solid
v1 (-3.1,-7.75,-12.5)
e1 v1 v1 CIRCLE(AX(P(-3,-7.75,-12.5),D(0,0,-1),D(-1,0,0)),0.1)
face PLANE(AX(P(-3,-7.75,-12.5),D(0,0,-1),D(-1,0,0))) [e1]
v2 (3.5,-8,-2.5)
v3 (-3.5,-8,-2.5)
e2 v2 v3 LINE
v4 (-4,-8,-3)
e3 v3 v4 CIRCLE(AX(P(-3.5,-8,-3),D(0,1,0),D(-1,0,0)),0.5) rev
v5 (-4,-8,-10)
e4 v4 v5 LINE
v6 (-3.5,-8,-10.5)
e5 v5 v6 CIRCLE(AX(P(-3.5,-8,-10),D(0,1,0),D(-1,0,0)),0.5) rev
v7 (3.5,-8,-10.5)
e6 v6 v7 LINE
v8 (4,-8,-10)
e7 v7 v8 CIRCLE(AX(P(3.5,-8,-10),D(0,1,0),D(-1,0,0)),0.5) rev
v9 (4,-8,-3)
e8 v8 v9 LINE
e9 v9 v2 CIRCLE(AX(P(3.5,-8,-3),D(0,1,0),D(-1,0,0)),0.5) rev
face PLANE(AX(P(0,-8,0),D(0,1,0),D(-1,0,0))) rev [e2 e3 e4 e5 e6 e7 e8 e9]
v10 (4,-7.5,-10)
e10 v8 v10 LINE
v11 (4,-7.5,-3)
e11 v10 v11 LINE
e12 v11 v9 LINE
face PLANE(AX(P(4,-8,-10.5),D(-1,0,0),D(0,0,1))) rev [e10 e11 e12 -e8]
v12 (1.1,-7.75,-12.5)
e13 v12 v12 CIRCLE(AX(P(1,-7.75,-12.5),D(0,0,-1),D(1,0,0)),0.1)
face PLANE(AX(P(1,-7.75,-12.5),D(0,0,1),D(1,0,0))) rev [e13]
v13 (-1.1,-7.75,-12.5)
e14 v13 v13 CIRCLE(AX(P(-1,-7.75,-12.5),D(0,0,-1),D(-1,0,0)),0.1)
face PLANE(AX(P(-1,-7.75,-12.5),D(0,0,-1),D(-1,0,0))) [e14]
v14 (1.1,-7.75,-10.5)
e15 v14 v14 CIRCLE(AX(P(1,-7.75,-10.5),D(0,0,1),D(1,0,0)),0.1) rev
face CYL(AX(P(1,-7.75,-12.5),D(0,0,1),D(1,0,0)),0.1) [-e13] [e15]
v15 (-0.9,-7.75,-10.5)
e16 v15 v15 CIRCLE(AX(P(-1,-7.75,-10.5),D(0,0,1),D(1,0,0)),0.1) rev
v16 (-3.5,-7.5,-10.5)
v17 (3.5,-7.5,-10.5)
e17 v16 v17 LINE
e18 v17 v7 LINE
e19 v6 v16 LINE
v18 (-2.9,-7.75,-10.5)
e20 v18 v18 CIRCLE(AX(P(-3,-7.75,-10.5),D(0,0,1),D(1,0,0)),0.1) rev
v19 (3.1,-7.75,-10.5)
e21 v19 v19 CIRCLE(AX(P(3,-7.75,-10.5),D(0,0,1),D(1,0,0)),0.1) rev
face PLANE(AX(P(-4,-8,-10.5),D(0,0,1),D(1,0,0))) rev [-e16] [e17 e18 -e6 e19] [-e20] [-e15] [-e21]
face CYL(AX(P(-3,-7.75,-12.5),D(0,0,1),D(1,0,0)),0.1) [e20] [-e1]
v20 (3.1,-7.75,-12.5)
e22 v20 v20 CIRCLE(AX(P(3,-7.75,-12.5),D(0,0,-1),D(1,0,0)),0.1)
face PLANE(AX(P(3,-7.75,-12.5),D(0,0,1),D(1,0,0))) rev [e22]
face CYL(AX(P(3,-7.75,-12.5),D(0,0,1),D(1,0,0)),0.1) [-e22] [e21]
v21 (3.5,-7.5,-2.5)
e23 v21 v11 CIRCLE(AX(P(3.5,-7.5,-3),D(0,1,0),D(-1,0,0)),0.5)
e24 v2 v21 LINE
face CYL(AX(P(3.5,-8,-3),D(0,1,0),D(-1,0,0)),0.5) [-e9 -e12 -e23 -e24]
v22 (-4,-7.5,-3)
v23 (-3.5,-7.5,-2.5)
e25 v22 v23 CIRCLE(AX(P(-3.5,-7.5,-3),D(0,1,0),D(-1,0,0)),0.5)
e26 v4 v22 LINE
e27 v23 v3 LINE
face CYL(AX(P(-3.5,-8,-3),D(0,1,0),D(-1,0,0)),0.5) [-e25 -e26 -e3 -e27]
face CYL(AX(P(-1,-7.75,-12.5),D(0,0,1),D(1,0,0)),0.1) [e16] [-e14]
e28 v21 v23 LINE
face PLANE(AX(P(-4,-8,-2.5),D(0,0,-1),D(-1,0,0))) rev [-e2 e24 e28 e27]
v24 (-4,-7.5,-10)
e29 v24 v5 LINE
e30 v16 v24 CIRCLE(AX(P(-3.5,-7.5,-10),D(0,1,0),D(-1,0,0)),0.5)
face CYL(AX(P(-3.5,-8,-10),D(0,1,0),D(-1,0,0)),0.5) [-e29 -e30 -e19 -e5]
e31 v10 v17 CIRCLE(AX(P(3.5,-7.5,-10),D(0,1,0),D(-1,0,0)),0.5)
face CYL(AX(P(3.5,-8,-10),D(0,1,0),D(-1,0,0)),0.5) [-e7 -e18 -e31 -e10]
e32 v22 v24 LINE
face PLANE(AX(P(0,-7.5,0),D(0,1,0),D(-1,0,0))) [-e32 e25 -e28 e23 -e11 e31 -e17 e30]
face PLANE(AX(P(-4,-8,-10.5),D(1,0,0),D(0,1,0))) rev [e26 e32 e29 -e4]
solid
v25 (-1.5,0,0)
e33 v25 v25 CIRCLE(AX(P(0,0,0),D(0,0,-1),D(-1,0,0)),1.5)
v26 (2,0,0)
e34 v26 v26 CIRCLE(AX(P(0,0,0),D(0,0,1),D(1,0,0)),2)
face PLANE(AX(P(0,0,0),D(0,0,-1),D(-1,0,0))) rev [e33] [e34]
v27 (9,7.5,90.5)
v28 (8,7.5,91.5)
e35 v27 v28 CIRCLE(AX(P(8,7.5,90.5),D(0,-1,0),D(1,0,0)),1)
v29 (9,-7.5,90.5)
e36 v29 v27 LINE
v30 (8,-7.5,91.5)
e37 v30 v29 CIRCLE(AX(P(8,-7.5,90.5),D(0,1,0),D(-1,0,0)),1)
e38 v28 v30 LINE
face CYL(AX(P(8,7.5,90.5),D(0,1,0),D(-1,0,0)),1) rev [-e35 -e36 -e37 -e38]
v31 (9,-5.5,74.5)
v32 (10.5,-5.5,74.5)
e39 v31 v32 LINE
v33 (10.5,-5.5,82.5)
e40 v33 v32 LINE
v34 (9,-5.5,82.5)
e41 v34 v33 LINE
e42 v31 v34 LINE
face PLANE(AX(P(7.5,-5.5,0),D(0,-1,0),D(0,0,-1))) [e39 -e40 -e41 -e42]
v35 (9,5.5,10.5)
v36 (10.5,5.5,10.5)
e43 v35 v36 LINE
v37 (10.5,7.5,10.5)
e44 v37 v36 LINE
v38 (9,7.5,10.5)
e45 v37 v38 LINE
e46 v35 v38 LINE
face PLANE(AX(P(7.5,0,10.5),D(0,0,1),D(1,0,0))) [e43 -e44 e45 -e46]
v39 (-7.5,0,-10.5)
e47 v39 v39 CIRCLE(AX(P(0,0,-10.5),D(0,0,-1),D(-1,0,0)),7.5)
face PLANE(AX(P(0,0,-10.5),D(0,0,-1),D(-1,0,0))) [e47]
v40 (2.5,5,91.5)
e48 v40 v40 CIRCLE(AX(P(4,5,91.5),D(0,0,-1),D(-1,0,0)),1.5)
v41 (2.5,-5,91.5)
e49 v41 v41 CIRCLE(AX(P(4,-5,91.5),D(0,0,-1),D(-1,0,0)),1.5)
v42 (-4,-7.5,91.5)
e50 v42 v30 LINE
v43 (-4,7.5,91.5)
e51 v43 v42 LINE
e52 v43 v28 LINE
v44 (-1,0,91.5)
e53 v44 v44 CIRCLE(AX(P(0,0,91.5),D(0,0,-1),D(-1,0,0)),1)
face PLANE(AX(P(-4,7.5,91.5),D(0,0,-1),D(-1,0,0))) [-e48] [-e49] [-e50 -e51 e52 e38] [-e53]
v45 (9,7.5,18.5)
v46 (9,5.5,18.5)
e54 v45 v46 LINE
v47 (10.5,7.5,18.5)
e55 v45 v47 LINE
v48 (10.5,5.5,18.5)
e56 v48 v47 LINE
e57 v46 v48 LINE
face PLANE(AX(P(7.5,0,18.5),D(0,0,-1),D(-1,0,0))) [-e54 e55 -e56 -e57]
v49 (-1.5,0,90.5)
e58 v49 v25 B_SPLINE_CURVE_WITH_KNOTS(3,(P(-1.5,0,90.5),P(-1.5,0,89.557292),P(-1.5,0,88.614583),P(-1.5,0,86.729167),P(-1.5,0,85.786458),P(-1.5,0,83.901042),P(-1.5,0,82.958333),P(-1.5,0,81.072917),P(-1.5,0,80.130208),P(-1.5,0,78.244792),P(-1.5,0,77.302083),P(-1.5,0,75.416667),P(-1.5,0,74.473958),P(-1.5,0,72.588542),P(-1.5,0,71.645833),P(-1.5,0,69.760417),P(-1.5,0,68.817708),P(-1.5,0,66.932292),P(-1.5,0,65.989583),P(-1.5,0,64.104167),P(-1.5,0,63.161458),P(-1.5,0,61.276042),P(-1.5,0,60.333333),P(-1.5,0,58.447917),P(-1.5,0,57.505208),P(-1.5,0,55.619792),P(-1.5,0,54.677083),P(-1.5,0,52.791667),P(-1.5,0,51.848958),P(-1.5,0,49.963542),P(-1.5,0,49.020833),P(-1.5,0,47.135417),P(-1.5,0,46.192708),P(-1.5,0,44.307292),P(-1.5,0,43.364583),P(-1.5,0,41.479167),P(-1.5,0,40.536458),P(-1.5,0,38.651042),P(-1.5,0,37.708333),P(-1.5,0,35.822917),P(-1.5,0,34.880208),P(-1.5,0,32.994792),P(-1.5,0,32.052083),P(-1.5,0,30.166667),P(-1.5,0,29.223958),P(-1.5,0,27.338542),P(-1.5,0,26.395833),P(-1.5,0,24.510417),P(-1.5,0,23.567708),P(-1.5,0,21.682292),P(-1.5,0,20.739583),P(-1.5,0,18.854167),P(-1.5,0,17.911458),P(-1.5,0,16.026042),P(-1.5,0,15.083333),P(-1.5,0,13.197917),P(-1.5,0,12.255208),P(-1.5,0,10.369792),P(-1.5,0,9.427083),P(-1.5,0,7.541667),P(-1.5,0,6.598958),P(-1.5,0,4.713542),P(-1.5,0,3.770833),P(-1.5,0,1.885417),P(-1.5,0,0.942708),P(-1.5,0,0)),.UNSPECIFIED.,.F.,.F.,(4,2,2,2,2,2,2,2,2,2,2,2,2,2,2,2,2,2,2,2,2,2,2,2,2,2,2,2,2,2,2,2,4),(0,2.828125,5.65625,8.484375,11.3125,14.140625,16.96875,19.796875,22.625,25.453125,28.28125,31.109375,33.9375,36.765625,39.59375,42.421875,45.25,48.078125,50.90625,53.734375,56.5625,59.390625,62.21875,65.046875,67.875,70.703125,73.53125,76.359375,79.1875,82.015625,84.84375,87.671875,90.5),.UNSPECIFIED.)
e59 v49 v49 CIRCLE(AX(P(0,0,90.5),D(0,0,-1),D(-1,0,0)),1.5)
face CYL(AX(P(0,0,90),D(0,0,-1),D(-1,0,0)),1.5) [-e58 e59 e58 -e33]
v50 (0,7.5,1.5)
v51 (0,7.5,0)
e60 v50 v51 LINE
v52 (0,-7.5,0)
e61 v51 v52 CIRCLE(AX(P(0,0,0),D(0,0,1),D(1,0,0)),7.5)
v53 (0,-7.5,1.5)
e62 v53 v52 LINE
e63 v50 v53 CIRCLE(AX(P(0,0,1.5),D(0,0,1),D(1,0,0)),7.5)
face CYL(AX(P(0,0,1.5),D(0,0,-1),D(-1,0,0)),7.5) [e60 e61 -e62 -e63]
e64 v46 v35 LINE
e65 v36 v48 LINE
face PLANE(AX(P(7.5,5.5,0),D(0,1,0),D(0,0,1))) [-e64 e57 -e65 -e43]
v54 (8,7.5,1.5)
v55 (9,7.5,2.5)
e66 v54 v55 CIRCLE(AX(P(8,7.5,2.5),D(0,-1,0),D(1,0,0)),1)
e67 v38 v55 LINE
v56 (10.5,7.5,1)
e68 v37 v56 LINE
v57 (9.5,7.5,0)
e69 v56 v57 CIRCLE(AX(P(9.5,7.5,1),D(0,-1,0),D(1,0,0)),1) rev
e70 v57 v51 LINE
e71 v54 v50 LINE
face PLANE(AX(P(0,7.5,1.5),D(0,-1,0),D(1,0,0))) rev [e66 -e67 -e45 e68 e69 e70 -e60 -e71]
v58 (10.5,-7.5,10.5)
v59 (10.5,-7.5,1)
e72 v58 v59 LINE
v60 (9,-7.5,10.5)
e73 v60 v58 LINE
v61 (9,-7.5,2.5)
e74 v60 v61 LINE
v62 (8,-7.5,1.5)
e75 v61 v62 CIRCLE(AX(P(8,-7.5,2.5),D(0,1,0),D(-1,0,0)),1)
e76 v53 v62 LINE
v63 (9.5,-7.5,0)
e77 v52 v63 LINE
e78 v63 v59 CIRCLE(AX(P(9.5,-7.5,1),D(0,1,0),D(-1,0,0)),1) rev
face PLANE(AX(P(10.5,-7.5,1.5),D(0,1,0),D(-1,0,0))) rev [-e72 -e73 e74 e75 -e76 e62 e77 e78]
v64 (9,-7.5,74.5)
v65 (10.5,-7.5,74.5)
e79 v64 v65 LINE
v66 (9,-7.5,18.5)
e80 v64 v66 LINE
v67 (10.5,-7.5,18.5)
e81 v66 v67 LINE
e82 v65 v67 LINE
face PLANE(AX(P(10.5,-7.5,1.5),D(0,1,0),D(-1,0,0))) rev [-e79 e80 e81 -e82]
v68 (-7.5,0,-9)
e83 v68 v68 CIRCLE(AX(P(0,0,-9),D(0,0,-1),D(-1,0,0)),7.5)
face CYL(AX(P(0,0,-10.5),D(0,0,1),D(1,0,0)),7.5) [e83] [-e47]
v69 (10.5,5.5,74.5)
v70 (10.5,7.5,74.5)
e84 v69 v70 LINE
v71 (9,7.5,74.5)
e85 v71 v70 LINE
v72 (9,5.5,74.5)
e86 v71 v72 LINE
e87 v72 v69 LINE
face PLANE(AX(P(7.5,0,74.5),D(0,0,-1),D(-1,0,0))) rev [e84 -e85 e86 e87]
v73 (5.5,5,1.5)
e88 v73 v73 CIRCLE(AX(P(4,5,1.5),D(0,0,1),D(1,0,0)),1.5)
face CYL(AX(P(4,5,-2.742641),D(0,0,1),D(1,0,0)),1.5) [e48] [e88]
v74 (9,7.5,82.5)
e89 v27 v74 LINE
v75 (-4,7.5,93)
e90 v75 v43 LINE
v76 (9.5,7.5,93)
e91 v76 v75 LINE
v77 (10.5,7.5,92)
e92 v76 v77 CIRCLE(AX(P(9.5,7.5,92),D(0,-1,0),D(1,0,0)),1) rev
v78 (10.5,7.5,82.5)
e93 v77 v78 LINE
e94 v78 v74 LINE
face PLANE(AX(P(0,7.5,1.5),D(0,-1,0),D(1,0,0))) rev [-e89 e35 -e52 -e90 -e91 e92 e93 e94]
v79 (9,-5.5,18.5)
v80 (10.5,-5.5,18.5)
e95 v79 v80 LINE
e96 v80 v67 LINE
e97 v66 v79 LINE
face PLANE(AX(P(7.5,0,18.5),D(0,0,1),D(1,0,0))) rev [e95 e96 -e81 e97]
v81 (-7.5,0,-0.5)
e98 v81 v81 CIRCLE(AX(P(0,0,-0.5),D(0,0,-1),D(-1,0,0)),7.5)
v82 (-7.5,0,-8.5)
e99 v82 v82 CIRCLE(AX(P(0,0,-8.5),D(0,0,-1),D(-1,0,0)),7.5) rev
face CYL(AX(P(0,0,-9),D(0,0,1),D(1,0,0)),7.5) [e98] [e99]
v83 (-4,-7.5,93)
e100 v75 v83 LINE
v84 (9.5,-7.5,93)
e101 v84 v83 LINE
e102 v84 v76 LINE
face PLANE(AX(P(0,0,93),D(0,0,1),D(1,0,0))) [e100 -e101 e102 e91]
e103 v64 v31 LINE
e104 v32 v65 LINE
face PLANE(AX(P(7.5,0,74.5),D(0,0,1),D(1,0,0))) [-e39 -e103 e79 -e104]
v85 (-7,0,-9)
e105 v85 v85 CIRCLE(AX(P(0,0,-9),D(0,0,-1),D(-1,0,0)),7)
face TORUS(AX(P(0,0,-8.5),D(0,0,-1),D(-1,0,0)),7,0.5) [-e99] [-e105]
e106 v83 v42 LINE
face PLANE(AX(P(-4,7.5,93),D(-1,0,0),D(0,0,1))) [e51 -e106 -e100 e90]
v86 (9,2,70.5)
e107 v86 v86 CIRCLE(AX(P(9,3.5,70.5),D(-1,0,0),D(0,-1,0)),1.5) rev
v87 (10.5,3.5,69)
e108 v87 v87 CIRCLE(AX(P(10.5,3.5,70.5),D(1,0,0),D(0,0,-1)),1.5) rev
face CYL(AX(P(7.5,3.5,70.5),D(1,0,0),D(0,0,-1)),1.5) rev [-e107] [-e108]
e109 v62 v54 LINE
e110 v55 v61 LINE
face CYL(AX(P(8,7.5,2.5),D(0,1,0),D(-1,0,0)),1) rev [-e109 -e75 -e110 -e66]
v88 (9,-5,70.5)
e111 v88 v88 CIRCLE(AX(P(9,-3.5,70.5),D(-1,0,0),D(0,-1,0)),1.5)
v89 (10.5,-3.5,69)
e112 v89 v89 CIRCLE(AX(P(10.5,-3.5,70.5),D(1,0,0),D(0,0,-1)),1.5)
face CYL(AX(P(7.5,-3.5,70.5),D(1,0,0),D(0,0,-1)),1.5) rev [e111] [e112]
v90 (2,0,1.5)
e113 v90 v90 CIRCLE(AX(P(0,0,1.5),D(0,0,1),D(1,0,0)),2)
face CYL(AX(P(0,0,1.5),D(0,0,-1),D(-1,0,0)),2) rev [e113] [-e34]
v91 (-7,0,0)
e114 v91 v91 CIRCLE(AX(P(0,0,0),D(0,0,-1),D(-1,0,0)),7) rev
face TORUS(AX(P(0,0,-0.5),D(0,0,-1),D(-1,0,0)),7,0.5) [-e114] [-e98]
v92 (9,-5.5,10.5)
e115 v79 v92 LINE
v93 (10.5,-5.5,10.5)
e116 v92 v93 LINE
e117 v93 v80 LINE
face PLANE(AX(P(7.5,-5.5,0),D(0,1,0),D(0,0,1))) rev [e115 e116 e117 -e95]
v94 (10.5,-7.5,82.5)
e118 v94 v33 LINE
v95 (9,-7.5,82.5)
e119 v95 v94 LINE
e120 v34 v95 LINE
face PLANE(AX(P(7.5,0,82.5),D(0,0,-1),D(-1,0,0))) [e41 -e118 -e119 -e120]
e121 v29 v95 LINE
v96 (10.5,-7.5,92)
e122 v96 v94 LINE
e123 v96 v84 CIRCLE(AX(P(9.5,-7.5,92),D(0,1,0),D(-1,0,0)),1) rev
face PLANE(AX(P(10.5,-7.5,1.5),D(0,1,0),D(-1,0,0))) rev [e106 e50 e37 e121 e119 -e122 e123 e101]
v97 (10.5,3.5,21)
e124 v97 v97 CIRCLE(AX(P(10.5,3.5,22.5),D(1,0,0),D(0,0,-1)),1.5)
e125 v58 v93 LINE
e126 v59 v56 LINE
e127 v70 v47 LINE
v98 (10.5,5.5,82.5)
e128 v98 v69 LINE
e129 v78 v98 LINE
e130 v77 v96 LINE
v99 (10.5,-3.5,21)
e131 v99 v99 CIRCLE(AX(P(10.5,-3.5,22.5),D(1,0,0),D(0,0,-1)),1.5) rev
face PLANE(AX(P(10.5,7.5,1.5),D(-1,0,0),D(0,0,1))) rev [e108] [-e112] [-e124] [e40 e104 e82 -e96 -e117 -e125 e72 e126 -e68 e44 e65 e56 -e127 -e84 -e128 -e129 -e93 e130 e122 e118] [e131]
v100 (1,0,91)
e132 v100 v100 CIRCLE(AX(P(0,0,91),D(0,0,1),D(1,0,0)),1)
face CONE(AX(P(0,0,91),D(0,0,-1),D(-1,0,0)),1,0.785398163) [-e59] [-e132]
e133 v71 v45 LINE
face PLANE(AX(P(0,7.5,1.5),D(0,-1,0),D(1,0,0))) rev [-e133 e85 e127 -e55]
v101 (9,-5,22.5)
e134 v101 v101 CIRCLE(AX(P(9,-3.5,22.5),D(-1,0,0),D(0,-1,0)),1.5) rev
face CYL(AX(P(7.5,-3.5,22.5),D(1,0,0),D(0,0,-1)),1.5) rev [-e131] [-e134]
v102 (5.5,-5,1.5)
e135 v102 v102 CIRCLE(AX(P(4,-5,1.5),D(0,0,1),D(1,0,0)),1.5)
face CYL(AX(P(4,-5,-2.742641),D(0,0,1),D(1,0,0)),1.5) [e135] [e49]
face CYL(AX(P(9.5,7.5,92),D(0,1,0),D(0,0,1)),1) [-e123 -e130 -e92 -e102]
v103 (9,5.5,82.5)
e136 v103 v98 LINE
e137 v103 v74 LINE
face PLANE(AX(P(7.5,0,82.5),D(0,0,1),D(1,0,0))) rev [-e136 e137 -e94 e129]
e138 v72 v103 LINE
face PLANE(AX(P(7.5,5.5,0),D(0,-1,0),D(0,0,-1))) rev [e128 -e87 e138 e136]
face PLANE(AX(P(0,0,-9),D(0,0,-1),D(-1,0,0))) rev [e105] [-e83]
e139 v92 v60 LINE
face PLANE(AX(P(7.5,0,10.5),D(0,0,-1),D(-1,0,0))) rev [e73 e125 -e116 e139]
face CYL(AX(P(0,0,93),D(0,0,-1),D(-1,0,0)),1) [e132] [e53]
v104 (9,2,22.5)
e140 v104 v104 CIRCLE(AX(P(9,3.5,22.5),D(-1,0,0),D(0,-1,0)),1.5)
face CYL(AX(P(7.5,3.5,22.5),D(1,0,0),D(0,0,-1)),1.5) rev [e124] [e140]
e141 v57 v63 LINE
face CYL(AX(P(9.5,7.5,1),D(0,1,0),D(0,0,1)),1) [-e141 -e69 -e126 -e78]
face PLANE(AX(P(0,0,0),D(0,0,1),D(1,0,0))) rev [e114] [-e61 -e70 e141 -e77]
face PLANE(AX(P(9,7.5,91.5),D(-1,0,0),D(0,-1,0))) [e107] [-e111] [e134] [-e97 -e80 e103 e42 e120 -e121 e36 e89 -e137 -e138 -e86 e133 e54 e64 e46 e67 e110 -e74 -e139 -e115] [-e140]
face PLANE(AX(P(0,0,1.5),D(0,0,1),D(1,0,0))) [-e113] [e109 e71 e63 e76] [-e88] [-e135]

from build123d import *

# Parameters (mm, degrees)
SKETCH_1_R          = 1.5
EXTRUDE_1_DEPTH     = 90
SKETCH_2_R          = 1
EXTRUDE_2_DEPTH     = 3
CHAMFER_1_SIZE      = 1
SKETCH_3_R          = 7.5
EXTRUDE_3_DEPTH     = 9
FILLET_1_R          = 0.5
EXTRUDE_START       = 1.5
SKETCH_4_R          = 2
EXTRUDE_4_DEPTH     = 1.5
SKETCH_5_R          = 7.5
EXTRUDE_5_DEPTH     = 1.5
EXTRUDE_6_DEPTH     = 15
FILLET_2_R          = 1
SKETCH_8_W          = 8
SKETCH_8_H          = 2
SKETCH_8_R          = 1.5
CUT_EXTRUDE_1_DEPTH = 3
SKETCH_9_R          = 1.5
EXTRUDE_7_DEPTH     = 91.5
SKETCH_10_W         = 8
SKETCH_10_H         = 8
EXTRUDE_8_DEPTH     = 0.5
SKETCH_12_R         = 0.1
EXTRUDE_9_DEPTH     = 2
FILLET_3_R          = 0.5


with BuildPart() as part:
    # 草图1 → 凸台-拉伸1 (new body)
    with BuildSketch(Plane.XY):
        with Locations(Location((0, 0, 0), (0, 0, 180))):
            Circle(SKETCH_1_R)
    extrude(amount=EXTRUDE_1_DEPTH)

    # 草图2 → 凸台-拉伸2 (add)
    with BuildSketch(Plane.XY.offset(90)):
        Circle(SKETCH_2_R)
    extrude(amount=EXTRUDE_2_DEPTH)

    # 倒角1
    # the kernel refuses this chamfer: 1 mm, written as the material it adds along each edge
    with BuildSketch(Plane(origin=(0, 0, 90), x_dir=(1, 0, 0), z_dir=(0, -1, 0))) as chamfer_1_piece_1_section:
        Polygon((1 + CHAMFER_1_SIZE, 0), (1, CHAMFER_1_SIZE), (1, 0), align=None)
    chamfer_1_piece_1 = revolve(axis=Axis((0, 0, 90), (0, 0, 1)), mode=Mode.PRIVATE)
    chamfer_1_piece_1 = chamfer_1_piece_1 & Plane(origin=(0, 0, 90.753826293), x_dir=(-1, 0, 0), z_dir=(0, 0, -1)) * Cylinder(1.5, 8, mode=Mode.PRIVATE)
    add(chamfer_1_piece_1)

    # 草图3 → 凸台-拉伸3 (add)
    with BuildSketch(Plane(origin=(0, 0, 0), x_dir=(-1, 0, 0), z_dir=(0, 0, -1))):
        Circle(SKETCH_3_R)
    extrude(amount=EXTRUDE_3_DEPTH)

    # 圆角1
    fillet_1_edges = [part.edges().sort_by_distance(p)[0] for p in [
        (7.5, 0, 0),
        (7.5, 0, -9),
    ]]
    fillet(fillet_1_edges, radius=FILLET_1_R)

    # 草图4 → 凸台-拉伸4 (add)
    with BuildSketch(Plane.XY.offset(EXTRUDE_START)):
        with BuildLine():
            Line((0, 7.5), (10.5, 7.5))
            Line((10.5, 7.5), (10.5, -7.5))
            Line((10.5, -7.5), (0, -7.5))
            ThreePointArc((0, -7.5), (-7.5, 0), (0, 7.5))
        make_face()
        Circle(SKETCH_4_R, mode=Mode.SUBTRACT)
    extrude(amount=-EXTRUDE_4_DEPTH)

    # 草图5 → 凸台-拉伸5 (add)
    with BuildSketch(Plane(origin=(0, 0, -9), x_dir=(-1, 0, 0), z_dir=(0, 0, -1))):
        Circle(SKETCH_5_R)
    extrude(amount=EXTRUDE_5_DEPTH)

    # 草图7 → 凸台-拉伸6 (add)
    with BuildSketch(Plane.XZ.offset(7.5)):
        Polygon((10.5, 1.5), (10.5, 93), (-4, 93), (-4, 91.5), (9, 91.5), (9, 1.5), align=None)
    extrude(amount=-EXTRUDE_6_DEPTH)

    # 圆角2
    fillet_2_edges = [part.edges().sort_by_distance(p)[0] for p in [
        (10.5, 0, 0),
        (9, 0, 1.5),
        (9, 0, 91.5),
        (10.5, 0, 93),
    ]]
    fillet(fillet_2_edges, radius=FILLET_2_R)

    # 草图8 → 切除-拉伸1 (cut)
    with BuildSketch(Plane(origin=(10.5, 0, 0), x_dir=(0, 0, -1), z_dir=(1, 0, 0))):
        with Locations((-78.5, -6.5)):
            Rectangle(SKETCH_8_W, SKETCH_8_H)
        with Locations((-78.5, 6.5)):
            Rectangle(SKETCH_8_W, SKETCH_8_H)
        with Locations((-70.5, -3.5)):
            Circle(SKETCH_8_R)
        with Locations((-70.5, 3.5)):
            Circle(SKETCH_8_R)
        with Locations((-22.5, -3.5)):
            Circle(SKETCH_8_R)
        with Locations((-14.5, -6.5)):
            Rectangle(SKETCH_8_W, SKETCH_8_H)
        with Locations((-14.5, 6.5)):
            Rectangle(SKETCH_8_W, SKETCH_8_H)
        with Locations((-22.5, 3.5)):
            Circle(SKETCH_8_R)
    extrude(amount=-CUT_EXTRUDE_1_DEPTH, mode=Mode.SUBTRACT)

    # 草图9 → 凸台-拉伸7 (add)
    with BuildSketch(Plane.XY.offset(93)):
        with Locations((4, -5)):
            Circle(SKETCH_9_R)
        with Locations((4, 5)):
            Circle(SKETCH_9_R)
    extrude(amount=-EXTRUDE_7_DEPTH)


with BuildPart() as body_2:
    # 草图10 → 凸台-拉伸8 (new body)
    with BuildSketch(Plane(origin=(0, -7.5, 0), x_dir=(-1, 0, 0), z_dir=(0, -1, 0))):
        with Locations((0, 6.5)):
            Rectangle(SKETCH_10_W, SKETCH_10_H)
    extrude(amount=EXTRUDE_8_DEPTH)

    # 草图12 → 凸台-拉伸9 (add)
    with BuildSketch(Plane(origin=(0, 0, -10.5), x_dir=(-1, 0, 0), z_dir=(0, 0, -1))):
        with Locations(Location((1, -7.75, 0), (0, 0, 180))):
            Circle(SKETCH_12_R)
        with Locations(Location((3, -7.75, 0), (0, 0, 180))):
            Circle(SKETCH_12_R)
        with Locations(Location((-1, -7.75, 0), (0, 0, 180))):
            Circle(SKETCH_12_R)
        with Locations(Location((-3, -7.75, 0), (0, 0, 180))):
            Circle(SKETCH_12_R)
    extrude(amount=EXTRUDE_9_DEPTH)

    # 圆角3
    fillet_3_edges = [body_2.edges().sort_by_distance(p)[0] for p in [
        (4, -7.75, -10.5),
        (-4, -7.75, -10.5),
        (-4, -7.75, -2.5),
        (4, -7.75, -2.5),
    ]]
    fillet(fillet_3_edges, radius=FILLET_3_R)


solid = Compound([part.part, body_2.part])
